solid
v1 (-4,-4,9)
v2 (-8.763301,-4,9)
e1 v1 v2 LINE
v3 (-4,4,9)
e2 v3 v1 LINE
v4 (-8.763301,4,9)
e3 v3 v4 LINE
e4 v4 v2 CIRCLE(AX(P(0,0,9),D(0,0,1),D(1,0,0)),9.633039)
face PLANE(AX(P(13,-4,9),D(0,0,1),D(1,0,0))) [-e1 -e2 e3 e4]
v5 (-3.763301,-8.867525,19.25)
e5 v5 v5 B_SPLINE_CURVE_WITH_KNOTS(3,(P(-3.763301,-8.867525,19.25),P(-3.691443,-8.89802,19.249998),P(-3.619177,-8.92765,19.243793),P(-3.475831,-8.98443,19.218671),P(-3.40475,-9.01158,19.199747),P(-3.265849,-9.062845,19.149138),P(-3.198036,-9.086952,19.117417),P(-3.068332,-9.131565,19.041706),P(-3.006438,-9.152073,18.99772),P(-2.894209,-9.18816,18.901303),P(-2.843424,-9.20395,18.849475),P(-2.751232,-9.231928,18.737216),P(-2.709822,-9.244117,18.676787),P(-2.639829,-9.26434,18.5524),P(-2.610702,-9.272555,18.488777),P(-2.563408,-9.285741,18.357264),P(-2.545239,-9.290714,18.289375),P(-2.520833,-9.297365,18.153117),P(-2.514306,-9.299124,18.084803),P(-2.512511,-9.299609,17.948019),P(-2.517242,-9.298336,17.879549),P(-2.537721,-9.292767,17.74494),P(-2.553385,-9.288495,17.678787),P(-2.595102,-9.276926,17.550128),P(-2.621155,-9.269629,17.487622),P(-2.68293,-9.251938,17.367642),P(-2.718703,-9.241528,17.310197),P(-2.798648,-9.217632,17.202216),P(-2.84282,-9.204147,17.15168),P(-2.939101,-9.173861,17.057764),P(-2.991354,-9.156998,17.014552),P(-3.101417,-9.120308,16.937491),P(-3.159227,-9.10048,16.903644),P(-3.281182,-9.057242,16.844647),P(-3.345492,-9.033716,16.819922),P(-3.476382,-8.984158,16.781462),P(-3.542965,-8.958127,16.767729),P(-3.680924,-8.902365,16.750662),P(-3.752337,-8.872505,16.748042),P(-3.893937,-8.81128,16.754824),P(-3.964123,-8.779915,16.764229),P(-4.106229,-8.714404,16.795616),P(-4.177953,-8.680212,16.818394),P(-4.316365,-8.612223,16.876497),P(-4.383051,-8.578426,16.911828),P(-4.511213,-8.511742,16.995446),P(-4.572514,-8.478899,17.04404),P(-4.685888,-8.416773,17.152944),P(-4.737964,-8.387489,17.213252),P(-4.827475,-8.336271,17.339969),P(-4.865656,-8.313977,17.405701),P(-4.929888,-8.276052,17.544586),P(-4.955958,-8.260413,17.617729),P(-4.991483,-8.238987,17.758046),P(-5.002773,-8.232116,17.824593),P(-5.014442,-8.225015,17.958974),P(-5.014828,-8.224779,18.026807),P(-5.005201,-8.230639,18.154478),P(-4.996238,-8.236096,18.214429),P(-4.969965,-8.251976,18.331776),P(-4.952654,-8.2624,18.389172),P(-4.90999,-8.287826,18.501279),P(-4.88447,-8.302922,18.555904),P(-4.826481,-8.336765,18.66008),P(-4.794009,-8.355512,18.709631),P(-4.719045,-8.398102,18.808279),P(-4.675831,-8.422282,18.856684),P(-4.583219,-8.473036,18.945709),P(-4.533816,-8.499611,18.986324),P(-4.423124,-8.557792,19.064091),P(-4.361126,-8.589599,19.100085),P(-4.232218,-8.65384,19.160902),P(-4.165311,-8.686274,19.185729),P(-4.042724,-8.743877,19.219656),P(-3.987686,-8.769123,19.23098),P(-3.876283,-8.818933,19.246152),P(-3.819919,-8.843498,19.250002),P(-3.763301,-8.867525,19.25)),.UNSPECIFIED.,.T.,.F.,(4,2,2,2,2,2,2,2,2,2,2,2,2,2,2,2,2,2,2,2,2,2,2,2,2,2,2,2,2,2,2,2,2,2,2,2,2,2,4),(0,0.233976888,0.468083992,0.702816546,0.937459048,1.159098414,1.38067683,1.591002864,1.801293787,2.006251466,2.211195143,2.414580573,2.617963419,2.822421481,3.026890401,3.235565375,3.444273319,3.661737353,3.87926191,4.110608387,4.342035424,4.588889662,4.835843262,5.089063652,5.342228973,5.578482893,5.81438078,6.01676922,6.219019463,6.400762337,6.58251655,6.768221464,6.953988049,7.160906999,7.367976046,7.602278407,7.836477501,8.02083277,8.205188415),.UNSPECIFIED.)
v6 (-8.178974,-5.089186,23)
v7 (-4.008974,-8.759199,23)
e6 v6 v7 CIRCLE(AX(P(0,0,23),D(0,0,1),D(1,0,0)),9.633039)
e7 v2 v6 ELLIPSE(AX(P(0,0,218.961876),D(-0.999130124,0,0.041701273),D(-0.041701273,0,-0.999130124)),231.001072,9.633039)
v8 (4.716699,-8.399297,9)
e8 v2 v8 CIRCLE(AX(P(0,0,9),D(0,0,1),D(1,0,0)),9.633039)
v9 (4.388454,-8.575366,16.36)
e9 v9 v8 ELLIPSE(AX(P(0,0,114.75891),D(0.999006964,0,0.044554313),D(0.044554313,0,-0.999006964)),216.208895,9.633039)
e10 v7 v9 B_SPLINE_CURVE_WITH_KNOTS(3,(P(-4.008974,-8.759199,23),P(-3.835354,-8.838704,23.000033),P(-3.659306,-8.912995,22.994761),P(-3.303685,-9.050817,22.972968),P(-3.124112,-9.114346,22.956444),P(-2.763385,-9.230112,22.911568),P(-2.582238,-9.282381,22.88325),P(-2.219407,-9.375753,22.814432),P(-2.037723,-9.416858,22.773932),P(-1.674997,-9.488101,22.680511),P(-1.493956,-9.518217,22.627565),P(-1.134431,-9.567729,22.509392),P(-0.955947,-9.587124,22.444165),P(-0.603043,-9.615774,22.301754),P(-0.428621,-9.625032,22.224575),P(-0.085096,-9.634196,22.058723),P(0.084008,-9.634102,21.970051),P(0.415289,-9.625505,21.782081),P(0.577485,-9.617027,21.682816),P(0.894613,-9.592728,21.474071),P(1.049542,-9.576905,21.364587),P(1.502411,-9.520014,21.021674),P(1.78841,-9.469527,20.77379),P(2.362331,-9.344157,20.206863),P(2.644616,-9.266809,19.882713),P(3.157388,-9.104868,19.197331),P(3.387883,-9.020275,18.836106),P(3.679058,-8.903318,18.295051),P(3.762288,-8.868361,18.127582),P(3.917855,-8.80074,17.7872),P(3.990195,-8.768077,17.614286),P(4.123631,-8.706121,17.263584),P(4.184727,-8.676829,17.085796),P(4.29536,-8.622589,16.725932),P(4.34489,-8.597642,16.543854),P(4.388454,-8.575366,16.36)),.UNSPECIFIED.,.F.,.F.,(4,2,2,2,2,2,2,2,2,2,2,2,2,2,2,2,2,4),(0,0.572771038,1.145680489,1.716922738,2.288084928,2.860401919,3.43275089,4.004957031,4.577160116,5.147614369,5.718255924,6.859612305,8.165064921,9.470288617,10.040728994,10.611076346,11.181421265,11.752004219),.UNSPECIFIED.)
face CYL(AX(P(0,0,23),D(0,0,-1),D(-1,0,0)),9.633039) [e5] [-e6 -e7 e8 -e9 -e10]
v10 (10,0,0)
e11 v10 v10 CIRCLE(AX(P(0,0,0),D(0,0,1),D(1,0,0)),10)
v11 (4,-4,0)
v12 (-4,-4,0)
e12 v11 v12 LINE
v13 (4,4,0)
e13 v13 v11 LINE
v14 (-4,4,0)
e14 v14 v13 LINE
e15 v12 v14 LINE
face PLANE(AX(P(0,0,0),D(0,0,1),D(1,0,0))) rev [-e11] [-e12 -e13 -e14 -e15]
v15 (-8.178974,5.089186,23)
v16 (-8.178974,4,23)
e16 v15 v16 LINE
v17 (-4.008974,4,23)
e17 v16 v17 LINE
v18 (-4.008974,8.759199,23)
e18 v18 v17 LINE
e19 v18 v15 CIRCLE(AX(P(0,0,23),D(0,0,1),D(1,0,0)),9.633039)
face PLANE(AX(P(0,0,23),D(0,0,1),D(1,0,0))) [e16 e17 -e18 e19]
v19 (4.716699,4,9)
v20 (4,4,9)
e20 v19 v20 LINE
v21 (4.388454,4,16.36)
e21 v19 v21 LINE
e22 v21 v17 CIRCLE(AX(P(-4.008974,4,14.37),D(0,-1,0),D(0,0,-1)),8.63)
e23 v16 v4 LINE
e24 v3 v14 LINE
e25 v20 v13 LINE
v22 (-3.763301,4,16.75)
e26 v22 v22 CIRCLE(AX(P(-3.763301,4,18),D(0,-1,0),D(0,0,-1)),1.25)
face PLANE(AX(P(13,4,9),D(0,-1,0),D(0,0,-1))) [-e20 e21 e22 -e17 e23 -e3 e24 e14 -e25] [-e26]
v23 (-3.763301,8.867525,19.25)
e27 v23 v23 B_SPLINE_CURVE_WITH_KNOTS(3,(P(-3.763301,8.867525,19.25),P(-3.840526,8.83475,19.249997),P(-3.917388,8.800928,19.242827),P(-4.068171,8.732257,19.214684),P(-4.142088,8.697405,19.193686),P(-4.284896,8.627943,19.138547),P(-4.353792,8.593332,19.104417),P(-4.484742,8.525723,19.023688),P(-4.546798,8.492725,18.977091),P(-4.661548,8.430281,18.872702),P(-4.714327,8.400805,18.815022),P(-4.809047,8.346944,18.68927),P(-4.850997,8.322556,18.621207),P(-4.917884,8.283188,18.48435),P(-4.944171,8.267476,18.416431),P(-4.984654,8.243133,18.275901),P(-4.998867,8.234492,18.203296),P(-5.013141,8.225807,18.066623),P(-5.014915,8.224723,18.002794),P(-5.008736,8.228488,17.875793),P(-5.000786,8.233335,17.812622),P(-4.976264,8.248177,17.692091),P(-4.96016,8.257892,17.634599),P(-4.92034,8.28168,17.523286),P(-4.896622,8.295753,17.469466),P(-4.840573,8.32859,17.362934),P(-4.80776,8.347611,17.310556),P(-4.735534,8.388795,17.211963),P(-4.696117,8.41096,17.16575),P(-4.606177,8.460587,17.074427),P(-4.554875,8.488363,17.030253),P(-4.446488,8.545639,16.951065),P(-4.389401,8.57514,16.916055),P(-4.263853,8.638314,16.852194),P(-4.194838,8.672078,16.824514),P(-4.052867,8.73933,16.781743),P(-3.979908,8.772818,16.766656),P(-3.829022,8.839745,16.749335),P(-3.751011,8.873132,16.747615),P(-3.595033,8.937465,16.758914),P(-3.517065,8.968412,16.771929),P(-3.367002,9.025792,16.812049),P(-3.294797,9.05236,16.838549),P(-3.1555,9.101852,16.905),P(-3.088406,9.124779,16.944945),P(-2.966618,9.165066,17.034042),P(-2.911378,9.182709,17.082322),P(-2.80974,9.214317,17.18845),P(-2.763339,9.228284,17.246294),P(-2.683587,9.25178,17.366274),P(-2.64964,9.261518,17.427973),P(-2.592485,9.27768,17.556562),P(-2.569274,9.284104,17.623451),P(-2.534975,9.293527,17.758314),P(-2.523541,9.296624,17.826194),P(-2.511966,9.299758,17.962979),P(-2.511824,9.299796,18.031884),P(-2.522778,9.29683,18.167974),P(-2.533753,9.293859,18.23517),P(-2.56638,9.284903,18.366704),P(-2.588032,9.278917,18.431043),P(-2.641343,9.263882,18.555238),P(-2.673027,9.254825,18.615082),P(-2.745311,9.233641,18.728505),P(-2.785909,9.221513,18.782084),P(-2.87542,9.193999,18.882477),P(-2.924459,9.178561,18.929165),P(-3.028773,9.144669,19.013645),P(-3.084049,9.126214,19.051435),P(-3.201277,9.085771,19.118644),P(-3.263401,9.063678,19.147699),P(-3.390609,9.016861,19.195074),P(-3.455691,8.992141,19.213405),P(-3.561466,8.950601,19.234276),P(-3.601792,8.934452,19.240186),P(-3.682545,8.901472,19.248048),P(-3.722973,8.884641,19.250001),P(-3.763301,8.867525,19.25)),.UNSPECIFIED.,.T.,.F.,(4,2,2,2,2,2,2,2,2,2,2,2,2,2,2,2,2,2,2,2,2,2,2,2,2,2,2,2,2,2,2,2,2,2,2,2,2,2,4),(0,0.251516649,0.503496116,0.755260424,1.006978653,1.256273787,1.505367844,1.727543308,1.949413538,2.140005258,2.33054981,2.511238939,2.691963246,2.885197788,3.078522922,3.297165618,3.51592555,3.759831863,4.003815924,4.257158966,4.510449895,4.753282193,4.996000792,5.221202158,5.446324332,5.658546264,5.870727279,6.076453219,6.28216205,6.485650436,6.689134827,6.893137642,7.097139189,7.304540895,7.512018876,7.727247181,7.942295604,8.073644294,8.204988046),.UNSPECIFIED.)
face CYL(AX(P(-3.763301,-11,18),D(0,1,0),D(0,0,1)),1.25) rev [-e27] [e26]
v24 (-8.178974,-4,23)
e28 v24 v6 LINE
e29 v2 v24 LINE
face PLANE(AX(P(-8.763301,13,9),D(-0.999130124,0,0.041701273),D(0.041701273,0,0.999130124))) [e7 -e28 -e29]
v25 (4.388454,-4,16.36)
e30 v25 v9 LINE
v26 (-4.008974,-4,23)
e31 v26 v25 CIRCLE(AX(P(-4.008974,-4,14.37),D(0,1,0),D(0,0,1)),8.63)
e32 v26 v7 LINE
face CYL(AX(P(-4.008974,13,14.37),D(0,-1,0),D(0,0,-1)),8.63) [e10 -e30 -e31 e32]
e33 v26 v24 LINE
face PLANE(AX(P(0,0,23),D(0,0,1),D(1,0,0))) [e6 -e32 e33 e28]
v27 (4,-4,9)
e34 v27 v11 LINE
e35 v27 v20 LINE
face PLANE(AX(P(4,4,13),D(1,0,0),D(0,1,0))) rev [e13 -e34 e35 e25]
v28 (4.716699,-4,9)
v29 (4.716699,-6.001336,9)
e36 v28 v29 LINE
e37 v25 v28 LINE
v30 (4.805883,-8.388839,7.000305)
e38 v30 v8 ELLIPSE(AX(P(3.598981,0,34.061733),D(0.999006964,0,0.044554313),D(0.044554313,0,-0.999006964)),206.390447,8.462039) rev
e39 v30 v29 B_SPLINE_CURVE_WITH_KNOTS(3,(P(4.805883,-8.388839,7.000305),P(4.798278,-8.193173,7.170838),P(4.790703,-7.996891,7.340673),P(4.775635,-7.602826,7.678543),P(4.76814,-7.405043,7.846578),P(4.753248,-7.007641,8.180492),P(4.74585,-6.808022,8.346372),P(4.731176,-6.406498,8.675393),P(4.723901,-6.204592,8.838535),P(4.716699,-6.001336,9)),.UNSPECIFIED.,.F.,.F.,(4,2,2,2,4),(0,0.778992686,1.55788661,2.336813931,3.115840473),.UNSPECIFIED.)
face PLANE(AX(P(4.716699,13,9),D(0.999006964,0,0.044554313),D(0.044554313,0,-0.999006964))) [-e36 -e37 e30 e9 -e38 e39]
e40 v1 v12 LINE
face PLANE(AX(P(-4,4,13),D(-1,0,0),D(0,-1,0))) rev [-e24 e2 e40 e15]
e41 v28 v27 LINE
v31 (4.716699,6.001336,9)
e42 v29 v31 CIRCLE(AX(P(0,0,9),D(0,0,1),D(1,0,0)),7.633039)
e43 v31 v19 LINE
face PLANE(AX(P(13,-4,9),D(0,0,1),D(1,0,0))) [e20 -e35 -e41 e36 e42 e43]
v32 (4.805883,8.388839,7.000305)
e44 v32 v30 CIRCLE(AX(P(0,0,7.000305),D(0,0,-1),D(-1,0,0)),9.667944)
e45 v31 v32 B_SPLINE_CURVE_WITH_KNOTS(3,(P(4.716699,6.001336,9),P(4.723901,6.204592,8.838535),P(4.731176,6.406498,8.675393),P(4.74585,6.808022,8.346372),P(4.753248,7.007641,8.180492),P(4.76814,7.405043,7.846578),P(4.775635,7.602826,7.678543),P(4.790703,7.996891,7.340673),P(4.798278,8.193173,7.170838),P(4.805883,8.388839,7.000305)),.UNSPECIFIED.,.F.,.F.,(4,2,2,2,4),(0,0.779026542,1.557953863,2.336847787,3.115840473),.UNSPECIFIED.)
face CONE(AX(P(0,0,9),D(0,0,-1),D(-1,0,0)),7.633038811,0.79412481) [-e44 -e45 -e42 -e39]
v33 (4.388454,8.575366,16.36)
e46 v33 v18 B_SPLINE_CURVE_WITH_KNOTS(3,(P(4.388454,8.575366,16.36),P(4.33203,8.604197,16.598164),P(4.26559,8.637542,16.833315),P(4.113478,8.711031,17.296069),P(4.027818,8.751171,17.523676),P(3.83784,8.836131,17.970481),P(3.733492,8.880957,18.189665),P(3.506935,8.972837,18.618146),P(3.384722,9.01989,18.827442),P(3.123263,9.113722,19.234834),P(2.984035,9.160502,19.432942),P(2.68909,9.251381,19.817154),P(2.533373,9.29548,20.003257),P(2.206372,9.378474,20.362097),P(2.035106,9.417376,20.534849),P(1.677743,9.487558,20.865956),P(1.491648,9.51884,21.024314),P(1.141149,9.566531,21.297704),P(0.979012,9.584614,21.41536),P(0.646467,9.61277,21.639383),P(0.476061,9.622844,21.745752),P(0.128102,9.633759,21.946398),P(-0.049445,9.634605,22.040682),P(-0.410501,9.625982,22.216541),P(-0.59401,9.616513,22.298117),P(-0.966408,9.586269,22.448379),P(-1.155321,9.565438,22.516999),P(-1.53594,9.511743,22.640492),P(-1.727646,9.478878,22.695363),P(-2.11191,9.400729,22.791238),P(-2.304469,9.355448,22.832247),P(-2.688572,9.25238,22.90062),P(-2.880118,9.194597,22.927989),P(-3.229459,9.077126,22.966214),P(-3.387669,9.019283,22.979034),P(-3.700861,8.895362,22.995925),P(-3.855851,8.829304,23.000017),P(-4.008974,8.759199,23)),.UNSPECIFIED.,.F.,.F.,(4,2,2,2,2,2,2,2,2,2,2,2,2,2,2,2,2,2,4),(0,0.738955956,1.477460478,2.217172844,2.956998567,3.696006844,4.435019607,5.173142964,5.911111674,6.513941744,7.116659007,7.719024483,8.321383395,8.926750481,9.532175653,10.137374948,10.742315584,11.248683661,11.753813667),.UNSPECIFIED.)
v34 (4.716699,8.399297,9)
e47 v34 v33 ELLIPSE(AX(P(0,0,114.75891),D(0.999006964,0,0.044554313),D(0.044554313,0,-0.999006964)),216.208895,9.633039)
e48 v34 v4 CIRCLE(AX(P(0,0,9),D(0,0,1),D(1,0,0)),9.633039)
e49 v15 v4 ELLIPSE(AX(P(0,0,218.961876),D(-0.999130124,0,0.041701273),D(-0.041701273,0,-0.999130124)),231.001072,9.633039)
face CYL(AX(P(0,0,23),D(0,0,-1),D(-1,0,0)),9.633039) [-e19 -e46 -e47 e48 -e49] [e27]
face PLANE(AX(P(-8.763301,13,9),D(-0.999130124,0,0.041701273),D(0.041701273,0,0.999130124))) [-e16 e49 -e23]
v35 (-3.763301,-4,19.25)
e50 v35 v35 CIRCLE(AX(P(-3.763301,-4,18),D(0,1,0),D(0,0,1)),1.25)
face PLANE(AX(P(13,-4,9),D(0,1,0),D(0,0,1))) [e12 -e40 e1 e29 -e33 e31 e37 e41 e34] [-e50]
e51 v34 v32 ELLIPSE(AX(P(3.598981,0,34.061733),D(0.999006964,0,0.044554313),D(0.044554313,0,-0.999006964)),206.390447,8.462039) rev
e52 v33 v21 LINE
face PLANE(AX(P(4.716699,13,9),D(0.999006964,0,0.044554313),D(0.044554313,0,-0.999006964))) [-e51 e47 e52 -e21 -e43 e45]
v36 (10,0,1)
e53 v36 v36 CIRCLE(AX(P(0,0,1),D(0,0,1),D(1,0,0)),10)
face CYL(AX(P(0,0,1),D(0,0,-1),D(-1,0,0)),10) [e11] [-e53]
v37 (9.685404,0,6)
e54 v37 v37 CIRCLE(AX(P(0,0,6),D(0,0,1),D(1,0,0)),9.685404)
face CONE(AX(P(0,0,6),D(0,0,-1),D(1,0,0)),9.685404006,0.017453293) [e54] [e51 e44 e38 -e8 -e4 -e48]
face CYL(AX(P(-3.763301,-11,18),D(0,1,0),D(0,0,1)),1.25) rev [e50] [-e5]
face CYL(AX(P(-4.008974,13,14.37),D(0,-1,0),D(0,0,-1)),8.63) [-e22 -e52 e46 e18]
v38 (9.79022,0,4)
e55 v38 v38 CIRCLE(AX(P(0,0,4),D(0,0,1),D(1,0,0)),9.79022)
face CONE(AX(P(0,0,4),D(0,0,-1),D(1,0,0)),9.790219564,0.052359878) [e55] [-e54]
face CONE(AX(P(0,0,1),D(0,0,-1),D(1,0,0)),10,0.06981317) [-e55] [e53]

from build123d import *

# Parameters (mm, degrees)
SKETCH1_R               = 10
BOSS_EXTRUDE1_DEPTH     = 1
SKETCH2_R               = 10
BOSS_EXTRUDE2_DEPTH     = 3
BOSS_EXTRUDE2_TAPER     = 4
SKETCH3_R               = 9.790219564
BOSS_EXTRUDE3_DEPTH     = 2
BOSS_EXTRUDE3_TAPER     = 3
SKETCH4_R               = 9.685404006
BOSS_EXTRUDE4_DEPTH     = 3
BOSS_EXTRUDE4_TAPER     = 1
SKETCH5_R               = 9.633038811
BOSS_EXTRUDE5_DEPTH     = 14
CUT_EXTRUDE1_DEPTH      = 13
CUT_EXTRUDE1_DEPTH_BACK = 13
SKETCH6_W               = 17.15
SKETCH6_H               = 8
CUT_EXTRUDE2_DEPTH      = 13
CUT_EXTRUDE2_DEPTH_BACK = 13
SKETCH8_W               = 8
SKETCH8_H               = 8
CUT_EXTRUDE3_DEPTH      = 13
SKETCH9_R               = 1.25
CUT_EXTRUDE4_DEPTH      = 11
CHAMFER1_SIZE           = 2


with BuildPart() as part:
    # Sketch1 → Boss-Extrude1 (new body)
    with BuildSketch(Plane.XY):
        Circle(SKETCH1_R)
    extrude(amount=BOSS_EXTRUDE1_DEPTH)

    # Sketch2 → Boss-Extrude2 (add)
    with BuildSketch(Plane.XY.offset(1)):
        Circle(SKETCH2_R)
    extrude(amount=BOSS_EXTRUDE2_DEPTH, taper=BOSS_EXTRUDE2_TAPER)

    # Sketch3 → Boss-Extrude3 (add)
    with BuildSketch(Plane.XY.offset(4)):
        Circle(SKETCH3_R)
    extrude(amount=BOSS_EXTRUDE3_DEPTH, taper=BOSS_EXTRUDE3_TAPER)

    # Sketch4 → Boss-Extrude4 (add)
    with BuildSketch(Plane.XY.offset(6)):
        Circle(SKETCH4_R)
    extrude(amount=BOSS_EXTRUDE4_DEPTH, taper=BOSS_EXTRUDE4_TAPER)

    # Sketch5 → Boss-Extrude5 (add)
    with BuildSketch(Plane.XY.offset(9)):
        Circle(SKETCH5_R)
    extrude(amount=BOSS_EXTRUDE5_DEPTH)

    # Sketch6 → Cut-Extrude1 (cut, two sides: drawn at the far end of the back side and taken through both)
    with BuildSketch(Plane(origin=(0, 0, 0), x_dir=(0, 0, -1), z_dir=(1, 0, 0)).offset(-CUT_EXTRUDE1_DEPTH_BACK)):
        with Locations((-17.575, 0)):
            Rectangle(SKETCH6_W, SKETCH6_H)
    extrude(amount=CUT_EXTRUDE1_DEPTH + CUT_EXTRUDE1_DEPTH_BACK, mode=Mode.SUBTRACT)

    # Sketch7 → Cut-Extrude2 (cut, two sides: drawn at the far end of the back side and taken through both)
    with BuildSketch(Plane(origin=(0, 0, 0), x_dir=(1, 0, 0), z_dir=(0, 1, 0)).offset(-CUT_EXTRUDE2_DEPTH_BACK)):
        with BuildLine():
            Line((-8.763300561, -9), (-10.263300561, -9))
            Line((-10.263300561, -9), (-10.263300561, -28.451581468))
            Line((-10.263300561, -28.451581468), (9.633038811, -28.451581468))
            Line((9.633038811, -28.451581468), (9.633038811, -9))
            Line((9.633038811, -9), (4.716699439, -9))
            Line((4.716699439, -9), (4.388453733, -16.36))
            ThreePointArc((4.388453733, -16.36), (1.343744491, -21.139438677), (-4.008974444, -23))
            Line((-4.008974444, -23), (-8.178974444, -23))
            Line((-8.178974444, -23), (-8.763300561, -9))
        make_face()
    extrude(amount=CUT_EXTRUDE2_DEPTH + CUT_EXTRUDE2_DEPTH_BACK, mode=Mode.SUBTRACT)

    # Sketch8 → Cut-Extrude3 (cut)
    with BuildSketch(Plane(origin=(0, 0, 0), x_dir=(-1, 0, 0), z_dir=(0, 0, -1))):
        Rectangle(SKETCH8_W, SKETCH8_H)
    extrude(amount=-CUT_EXTRUDE3_DEPTH, mode=Mode.SUBTRACT)

    # Sketch9 → Cut-Extrude4 (cut, symmetric)
    with BuildSketch(Plane(origin=(0, 0, 0), x_dir=(1, 0, 0), z_dir=(0, 1, 0))):
        with Locations(Location((-3.763300561, -18, 0), (0, 0, 270))):
            Circle(SKETCH9_R)
    extrude(amount=CUT_EXTRUDE4_DEPTH, both=True, mode=Mode.SUBTRACT)

    # Chamfer1
    # the kernel refuses this chamfer: 2 mm, written as the material it takes off along each edge
    with BuildSketch(Plane(origin=(0, 0, 9), x_dir=(-0.022475112384337453, 0.9997474027589727, 0), z_dir=(-0.9997474027589727, -0.022475112384337453, 0))) as chamfer1_piece_1_section:
        Polygon((9.633038811 - CHAMFER1_SIZE, 0), (9.633038811 + CHAMFER1_SIZE * 0.0174524064372, CHAMFER1_SIZE * 0.999847695156), (9.633038811, 0), align=None)
    chamfer1_piece_1 = revolve(axis=Axis((0, 0, 9), (0, 0, -1)), revolution_arc=91.28783752, mode=Mode.PRIVATE)
    chamfer1_piece_1 = split(chamfer1_piece_1, bisect_by=Plane(origin=(4.752278324, 4.191519128, 8.202242122), z_dir=(0.9990069635270563, 0, 0.0445543131969368)), keep=Keep.TOP, mode=Mode.PRIVATE)
    add(chamfer1_piece_1, mode=Mode.SUBTRACT)
    with BuildSketch(Plane(origin=(0, 0, 9), x_dir=(1, 0, 0), z_dir=(0, 1, 0))) as chamfer1_piece_2_section:
        Polygon((9.633038811 - CHAMFER1_SIZE, 0), (9.633038811 + CHAMFER1_SIZE * 0.0174524064373, CHAMFER1_SIZE * 0.999847695156), (9.633038811, 0), align=None)
    chamfer1_piece_2 = revolve(axis=Axis((0, 0, 9), (0, 0, -1)), revolution_arc=91.28783752, mode=Mode.PRIVATE)
    chamfer1_piece_2 = split(chamfer1_piece_2, bisect_by=Plane(origin=(4.752278326, -4.191519128, 8.202242073), z_dir=(0.9990069635270563, 0, 0.0445543131969368)), keep=Keep.TOP, mode=Mode.PRIVATE)
    add(chamfer1_piece_2, mode=Mode.SUBTRACT)


solid = part.part
